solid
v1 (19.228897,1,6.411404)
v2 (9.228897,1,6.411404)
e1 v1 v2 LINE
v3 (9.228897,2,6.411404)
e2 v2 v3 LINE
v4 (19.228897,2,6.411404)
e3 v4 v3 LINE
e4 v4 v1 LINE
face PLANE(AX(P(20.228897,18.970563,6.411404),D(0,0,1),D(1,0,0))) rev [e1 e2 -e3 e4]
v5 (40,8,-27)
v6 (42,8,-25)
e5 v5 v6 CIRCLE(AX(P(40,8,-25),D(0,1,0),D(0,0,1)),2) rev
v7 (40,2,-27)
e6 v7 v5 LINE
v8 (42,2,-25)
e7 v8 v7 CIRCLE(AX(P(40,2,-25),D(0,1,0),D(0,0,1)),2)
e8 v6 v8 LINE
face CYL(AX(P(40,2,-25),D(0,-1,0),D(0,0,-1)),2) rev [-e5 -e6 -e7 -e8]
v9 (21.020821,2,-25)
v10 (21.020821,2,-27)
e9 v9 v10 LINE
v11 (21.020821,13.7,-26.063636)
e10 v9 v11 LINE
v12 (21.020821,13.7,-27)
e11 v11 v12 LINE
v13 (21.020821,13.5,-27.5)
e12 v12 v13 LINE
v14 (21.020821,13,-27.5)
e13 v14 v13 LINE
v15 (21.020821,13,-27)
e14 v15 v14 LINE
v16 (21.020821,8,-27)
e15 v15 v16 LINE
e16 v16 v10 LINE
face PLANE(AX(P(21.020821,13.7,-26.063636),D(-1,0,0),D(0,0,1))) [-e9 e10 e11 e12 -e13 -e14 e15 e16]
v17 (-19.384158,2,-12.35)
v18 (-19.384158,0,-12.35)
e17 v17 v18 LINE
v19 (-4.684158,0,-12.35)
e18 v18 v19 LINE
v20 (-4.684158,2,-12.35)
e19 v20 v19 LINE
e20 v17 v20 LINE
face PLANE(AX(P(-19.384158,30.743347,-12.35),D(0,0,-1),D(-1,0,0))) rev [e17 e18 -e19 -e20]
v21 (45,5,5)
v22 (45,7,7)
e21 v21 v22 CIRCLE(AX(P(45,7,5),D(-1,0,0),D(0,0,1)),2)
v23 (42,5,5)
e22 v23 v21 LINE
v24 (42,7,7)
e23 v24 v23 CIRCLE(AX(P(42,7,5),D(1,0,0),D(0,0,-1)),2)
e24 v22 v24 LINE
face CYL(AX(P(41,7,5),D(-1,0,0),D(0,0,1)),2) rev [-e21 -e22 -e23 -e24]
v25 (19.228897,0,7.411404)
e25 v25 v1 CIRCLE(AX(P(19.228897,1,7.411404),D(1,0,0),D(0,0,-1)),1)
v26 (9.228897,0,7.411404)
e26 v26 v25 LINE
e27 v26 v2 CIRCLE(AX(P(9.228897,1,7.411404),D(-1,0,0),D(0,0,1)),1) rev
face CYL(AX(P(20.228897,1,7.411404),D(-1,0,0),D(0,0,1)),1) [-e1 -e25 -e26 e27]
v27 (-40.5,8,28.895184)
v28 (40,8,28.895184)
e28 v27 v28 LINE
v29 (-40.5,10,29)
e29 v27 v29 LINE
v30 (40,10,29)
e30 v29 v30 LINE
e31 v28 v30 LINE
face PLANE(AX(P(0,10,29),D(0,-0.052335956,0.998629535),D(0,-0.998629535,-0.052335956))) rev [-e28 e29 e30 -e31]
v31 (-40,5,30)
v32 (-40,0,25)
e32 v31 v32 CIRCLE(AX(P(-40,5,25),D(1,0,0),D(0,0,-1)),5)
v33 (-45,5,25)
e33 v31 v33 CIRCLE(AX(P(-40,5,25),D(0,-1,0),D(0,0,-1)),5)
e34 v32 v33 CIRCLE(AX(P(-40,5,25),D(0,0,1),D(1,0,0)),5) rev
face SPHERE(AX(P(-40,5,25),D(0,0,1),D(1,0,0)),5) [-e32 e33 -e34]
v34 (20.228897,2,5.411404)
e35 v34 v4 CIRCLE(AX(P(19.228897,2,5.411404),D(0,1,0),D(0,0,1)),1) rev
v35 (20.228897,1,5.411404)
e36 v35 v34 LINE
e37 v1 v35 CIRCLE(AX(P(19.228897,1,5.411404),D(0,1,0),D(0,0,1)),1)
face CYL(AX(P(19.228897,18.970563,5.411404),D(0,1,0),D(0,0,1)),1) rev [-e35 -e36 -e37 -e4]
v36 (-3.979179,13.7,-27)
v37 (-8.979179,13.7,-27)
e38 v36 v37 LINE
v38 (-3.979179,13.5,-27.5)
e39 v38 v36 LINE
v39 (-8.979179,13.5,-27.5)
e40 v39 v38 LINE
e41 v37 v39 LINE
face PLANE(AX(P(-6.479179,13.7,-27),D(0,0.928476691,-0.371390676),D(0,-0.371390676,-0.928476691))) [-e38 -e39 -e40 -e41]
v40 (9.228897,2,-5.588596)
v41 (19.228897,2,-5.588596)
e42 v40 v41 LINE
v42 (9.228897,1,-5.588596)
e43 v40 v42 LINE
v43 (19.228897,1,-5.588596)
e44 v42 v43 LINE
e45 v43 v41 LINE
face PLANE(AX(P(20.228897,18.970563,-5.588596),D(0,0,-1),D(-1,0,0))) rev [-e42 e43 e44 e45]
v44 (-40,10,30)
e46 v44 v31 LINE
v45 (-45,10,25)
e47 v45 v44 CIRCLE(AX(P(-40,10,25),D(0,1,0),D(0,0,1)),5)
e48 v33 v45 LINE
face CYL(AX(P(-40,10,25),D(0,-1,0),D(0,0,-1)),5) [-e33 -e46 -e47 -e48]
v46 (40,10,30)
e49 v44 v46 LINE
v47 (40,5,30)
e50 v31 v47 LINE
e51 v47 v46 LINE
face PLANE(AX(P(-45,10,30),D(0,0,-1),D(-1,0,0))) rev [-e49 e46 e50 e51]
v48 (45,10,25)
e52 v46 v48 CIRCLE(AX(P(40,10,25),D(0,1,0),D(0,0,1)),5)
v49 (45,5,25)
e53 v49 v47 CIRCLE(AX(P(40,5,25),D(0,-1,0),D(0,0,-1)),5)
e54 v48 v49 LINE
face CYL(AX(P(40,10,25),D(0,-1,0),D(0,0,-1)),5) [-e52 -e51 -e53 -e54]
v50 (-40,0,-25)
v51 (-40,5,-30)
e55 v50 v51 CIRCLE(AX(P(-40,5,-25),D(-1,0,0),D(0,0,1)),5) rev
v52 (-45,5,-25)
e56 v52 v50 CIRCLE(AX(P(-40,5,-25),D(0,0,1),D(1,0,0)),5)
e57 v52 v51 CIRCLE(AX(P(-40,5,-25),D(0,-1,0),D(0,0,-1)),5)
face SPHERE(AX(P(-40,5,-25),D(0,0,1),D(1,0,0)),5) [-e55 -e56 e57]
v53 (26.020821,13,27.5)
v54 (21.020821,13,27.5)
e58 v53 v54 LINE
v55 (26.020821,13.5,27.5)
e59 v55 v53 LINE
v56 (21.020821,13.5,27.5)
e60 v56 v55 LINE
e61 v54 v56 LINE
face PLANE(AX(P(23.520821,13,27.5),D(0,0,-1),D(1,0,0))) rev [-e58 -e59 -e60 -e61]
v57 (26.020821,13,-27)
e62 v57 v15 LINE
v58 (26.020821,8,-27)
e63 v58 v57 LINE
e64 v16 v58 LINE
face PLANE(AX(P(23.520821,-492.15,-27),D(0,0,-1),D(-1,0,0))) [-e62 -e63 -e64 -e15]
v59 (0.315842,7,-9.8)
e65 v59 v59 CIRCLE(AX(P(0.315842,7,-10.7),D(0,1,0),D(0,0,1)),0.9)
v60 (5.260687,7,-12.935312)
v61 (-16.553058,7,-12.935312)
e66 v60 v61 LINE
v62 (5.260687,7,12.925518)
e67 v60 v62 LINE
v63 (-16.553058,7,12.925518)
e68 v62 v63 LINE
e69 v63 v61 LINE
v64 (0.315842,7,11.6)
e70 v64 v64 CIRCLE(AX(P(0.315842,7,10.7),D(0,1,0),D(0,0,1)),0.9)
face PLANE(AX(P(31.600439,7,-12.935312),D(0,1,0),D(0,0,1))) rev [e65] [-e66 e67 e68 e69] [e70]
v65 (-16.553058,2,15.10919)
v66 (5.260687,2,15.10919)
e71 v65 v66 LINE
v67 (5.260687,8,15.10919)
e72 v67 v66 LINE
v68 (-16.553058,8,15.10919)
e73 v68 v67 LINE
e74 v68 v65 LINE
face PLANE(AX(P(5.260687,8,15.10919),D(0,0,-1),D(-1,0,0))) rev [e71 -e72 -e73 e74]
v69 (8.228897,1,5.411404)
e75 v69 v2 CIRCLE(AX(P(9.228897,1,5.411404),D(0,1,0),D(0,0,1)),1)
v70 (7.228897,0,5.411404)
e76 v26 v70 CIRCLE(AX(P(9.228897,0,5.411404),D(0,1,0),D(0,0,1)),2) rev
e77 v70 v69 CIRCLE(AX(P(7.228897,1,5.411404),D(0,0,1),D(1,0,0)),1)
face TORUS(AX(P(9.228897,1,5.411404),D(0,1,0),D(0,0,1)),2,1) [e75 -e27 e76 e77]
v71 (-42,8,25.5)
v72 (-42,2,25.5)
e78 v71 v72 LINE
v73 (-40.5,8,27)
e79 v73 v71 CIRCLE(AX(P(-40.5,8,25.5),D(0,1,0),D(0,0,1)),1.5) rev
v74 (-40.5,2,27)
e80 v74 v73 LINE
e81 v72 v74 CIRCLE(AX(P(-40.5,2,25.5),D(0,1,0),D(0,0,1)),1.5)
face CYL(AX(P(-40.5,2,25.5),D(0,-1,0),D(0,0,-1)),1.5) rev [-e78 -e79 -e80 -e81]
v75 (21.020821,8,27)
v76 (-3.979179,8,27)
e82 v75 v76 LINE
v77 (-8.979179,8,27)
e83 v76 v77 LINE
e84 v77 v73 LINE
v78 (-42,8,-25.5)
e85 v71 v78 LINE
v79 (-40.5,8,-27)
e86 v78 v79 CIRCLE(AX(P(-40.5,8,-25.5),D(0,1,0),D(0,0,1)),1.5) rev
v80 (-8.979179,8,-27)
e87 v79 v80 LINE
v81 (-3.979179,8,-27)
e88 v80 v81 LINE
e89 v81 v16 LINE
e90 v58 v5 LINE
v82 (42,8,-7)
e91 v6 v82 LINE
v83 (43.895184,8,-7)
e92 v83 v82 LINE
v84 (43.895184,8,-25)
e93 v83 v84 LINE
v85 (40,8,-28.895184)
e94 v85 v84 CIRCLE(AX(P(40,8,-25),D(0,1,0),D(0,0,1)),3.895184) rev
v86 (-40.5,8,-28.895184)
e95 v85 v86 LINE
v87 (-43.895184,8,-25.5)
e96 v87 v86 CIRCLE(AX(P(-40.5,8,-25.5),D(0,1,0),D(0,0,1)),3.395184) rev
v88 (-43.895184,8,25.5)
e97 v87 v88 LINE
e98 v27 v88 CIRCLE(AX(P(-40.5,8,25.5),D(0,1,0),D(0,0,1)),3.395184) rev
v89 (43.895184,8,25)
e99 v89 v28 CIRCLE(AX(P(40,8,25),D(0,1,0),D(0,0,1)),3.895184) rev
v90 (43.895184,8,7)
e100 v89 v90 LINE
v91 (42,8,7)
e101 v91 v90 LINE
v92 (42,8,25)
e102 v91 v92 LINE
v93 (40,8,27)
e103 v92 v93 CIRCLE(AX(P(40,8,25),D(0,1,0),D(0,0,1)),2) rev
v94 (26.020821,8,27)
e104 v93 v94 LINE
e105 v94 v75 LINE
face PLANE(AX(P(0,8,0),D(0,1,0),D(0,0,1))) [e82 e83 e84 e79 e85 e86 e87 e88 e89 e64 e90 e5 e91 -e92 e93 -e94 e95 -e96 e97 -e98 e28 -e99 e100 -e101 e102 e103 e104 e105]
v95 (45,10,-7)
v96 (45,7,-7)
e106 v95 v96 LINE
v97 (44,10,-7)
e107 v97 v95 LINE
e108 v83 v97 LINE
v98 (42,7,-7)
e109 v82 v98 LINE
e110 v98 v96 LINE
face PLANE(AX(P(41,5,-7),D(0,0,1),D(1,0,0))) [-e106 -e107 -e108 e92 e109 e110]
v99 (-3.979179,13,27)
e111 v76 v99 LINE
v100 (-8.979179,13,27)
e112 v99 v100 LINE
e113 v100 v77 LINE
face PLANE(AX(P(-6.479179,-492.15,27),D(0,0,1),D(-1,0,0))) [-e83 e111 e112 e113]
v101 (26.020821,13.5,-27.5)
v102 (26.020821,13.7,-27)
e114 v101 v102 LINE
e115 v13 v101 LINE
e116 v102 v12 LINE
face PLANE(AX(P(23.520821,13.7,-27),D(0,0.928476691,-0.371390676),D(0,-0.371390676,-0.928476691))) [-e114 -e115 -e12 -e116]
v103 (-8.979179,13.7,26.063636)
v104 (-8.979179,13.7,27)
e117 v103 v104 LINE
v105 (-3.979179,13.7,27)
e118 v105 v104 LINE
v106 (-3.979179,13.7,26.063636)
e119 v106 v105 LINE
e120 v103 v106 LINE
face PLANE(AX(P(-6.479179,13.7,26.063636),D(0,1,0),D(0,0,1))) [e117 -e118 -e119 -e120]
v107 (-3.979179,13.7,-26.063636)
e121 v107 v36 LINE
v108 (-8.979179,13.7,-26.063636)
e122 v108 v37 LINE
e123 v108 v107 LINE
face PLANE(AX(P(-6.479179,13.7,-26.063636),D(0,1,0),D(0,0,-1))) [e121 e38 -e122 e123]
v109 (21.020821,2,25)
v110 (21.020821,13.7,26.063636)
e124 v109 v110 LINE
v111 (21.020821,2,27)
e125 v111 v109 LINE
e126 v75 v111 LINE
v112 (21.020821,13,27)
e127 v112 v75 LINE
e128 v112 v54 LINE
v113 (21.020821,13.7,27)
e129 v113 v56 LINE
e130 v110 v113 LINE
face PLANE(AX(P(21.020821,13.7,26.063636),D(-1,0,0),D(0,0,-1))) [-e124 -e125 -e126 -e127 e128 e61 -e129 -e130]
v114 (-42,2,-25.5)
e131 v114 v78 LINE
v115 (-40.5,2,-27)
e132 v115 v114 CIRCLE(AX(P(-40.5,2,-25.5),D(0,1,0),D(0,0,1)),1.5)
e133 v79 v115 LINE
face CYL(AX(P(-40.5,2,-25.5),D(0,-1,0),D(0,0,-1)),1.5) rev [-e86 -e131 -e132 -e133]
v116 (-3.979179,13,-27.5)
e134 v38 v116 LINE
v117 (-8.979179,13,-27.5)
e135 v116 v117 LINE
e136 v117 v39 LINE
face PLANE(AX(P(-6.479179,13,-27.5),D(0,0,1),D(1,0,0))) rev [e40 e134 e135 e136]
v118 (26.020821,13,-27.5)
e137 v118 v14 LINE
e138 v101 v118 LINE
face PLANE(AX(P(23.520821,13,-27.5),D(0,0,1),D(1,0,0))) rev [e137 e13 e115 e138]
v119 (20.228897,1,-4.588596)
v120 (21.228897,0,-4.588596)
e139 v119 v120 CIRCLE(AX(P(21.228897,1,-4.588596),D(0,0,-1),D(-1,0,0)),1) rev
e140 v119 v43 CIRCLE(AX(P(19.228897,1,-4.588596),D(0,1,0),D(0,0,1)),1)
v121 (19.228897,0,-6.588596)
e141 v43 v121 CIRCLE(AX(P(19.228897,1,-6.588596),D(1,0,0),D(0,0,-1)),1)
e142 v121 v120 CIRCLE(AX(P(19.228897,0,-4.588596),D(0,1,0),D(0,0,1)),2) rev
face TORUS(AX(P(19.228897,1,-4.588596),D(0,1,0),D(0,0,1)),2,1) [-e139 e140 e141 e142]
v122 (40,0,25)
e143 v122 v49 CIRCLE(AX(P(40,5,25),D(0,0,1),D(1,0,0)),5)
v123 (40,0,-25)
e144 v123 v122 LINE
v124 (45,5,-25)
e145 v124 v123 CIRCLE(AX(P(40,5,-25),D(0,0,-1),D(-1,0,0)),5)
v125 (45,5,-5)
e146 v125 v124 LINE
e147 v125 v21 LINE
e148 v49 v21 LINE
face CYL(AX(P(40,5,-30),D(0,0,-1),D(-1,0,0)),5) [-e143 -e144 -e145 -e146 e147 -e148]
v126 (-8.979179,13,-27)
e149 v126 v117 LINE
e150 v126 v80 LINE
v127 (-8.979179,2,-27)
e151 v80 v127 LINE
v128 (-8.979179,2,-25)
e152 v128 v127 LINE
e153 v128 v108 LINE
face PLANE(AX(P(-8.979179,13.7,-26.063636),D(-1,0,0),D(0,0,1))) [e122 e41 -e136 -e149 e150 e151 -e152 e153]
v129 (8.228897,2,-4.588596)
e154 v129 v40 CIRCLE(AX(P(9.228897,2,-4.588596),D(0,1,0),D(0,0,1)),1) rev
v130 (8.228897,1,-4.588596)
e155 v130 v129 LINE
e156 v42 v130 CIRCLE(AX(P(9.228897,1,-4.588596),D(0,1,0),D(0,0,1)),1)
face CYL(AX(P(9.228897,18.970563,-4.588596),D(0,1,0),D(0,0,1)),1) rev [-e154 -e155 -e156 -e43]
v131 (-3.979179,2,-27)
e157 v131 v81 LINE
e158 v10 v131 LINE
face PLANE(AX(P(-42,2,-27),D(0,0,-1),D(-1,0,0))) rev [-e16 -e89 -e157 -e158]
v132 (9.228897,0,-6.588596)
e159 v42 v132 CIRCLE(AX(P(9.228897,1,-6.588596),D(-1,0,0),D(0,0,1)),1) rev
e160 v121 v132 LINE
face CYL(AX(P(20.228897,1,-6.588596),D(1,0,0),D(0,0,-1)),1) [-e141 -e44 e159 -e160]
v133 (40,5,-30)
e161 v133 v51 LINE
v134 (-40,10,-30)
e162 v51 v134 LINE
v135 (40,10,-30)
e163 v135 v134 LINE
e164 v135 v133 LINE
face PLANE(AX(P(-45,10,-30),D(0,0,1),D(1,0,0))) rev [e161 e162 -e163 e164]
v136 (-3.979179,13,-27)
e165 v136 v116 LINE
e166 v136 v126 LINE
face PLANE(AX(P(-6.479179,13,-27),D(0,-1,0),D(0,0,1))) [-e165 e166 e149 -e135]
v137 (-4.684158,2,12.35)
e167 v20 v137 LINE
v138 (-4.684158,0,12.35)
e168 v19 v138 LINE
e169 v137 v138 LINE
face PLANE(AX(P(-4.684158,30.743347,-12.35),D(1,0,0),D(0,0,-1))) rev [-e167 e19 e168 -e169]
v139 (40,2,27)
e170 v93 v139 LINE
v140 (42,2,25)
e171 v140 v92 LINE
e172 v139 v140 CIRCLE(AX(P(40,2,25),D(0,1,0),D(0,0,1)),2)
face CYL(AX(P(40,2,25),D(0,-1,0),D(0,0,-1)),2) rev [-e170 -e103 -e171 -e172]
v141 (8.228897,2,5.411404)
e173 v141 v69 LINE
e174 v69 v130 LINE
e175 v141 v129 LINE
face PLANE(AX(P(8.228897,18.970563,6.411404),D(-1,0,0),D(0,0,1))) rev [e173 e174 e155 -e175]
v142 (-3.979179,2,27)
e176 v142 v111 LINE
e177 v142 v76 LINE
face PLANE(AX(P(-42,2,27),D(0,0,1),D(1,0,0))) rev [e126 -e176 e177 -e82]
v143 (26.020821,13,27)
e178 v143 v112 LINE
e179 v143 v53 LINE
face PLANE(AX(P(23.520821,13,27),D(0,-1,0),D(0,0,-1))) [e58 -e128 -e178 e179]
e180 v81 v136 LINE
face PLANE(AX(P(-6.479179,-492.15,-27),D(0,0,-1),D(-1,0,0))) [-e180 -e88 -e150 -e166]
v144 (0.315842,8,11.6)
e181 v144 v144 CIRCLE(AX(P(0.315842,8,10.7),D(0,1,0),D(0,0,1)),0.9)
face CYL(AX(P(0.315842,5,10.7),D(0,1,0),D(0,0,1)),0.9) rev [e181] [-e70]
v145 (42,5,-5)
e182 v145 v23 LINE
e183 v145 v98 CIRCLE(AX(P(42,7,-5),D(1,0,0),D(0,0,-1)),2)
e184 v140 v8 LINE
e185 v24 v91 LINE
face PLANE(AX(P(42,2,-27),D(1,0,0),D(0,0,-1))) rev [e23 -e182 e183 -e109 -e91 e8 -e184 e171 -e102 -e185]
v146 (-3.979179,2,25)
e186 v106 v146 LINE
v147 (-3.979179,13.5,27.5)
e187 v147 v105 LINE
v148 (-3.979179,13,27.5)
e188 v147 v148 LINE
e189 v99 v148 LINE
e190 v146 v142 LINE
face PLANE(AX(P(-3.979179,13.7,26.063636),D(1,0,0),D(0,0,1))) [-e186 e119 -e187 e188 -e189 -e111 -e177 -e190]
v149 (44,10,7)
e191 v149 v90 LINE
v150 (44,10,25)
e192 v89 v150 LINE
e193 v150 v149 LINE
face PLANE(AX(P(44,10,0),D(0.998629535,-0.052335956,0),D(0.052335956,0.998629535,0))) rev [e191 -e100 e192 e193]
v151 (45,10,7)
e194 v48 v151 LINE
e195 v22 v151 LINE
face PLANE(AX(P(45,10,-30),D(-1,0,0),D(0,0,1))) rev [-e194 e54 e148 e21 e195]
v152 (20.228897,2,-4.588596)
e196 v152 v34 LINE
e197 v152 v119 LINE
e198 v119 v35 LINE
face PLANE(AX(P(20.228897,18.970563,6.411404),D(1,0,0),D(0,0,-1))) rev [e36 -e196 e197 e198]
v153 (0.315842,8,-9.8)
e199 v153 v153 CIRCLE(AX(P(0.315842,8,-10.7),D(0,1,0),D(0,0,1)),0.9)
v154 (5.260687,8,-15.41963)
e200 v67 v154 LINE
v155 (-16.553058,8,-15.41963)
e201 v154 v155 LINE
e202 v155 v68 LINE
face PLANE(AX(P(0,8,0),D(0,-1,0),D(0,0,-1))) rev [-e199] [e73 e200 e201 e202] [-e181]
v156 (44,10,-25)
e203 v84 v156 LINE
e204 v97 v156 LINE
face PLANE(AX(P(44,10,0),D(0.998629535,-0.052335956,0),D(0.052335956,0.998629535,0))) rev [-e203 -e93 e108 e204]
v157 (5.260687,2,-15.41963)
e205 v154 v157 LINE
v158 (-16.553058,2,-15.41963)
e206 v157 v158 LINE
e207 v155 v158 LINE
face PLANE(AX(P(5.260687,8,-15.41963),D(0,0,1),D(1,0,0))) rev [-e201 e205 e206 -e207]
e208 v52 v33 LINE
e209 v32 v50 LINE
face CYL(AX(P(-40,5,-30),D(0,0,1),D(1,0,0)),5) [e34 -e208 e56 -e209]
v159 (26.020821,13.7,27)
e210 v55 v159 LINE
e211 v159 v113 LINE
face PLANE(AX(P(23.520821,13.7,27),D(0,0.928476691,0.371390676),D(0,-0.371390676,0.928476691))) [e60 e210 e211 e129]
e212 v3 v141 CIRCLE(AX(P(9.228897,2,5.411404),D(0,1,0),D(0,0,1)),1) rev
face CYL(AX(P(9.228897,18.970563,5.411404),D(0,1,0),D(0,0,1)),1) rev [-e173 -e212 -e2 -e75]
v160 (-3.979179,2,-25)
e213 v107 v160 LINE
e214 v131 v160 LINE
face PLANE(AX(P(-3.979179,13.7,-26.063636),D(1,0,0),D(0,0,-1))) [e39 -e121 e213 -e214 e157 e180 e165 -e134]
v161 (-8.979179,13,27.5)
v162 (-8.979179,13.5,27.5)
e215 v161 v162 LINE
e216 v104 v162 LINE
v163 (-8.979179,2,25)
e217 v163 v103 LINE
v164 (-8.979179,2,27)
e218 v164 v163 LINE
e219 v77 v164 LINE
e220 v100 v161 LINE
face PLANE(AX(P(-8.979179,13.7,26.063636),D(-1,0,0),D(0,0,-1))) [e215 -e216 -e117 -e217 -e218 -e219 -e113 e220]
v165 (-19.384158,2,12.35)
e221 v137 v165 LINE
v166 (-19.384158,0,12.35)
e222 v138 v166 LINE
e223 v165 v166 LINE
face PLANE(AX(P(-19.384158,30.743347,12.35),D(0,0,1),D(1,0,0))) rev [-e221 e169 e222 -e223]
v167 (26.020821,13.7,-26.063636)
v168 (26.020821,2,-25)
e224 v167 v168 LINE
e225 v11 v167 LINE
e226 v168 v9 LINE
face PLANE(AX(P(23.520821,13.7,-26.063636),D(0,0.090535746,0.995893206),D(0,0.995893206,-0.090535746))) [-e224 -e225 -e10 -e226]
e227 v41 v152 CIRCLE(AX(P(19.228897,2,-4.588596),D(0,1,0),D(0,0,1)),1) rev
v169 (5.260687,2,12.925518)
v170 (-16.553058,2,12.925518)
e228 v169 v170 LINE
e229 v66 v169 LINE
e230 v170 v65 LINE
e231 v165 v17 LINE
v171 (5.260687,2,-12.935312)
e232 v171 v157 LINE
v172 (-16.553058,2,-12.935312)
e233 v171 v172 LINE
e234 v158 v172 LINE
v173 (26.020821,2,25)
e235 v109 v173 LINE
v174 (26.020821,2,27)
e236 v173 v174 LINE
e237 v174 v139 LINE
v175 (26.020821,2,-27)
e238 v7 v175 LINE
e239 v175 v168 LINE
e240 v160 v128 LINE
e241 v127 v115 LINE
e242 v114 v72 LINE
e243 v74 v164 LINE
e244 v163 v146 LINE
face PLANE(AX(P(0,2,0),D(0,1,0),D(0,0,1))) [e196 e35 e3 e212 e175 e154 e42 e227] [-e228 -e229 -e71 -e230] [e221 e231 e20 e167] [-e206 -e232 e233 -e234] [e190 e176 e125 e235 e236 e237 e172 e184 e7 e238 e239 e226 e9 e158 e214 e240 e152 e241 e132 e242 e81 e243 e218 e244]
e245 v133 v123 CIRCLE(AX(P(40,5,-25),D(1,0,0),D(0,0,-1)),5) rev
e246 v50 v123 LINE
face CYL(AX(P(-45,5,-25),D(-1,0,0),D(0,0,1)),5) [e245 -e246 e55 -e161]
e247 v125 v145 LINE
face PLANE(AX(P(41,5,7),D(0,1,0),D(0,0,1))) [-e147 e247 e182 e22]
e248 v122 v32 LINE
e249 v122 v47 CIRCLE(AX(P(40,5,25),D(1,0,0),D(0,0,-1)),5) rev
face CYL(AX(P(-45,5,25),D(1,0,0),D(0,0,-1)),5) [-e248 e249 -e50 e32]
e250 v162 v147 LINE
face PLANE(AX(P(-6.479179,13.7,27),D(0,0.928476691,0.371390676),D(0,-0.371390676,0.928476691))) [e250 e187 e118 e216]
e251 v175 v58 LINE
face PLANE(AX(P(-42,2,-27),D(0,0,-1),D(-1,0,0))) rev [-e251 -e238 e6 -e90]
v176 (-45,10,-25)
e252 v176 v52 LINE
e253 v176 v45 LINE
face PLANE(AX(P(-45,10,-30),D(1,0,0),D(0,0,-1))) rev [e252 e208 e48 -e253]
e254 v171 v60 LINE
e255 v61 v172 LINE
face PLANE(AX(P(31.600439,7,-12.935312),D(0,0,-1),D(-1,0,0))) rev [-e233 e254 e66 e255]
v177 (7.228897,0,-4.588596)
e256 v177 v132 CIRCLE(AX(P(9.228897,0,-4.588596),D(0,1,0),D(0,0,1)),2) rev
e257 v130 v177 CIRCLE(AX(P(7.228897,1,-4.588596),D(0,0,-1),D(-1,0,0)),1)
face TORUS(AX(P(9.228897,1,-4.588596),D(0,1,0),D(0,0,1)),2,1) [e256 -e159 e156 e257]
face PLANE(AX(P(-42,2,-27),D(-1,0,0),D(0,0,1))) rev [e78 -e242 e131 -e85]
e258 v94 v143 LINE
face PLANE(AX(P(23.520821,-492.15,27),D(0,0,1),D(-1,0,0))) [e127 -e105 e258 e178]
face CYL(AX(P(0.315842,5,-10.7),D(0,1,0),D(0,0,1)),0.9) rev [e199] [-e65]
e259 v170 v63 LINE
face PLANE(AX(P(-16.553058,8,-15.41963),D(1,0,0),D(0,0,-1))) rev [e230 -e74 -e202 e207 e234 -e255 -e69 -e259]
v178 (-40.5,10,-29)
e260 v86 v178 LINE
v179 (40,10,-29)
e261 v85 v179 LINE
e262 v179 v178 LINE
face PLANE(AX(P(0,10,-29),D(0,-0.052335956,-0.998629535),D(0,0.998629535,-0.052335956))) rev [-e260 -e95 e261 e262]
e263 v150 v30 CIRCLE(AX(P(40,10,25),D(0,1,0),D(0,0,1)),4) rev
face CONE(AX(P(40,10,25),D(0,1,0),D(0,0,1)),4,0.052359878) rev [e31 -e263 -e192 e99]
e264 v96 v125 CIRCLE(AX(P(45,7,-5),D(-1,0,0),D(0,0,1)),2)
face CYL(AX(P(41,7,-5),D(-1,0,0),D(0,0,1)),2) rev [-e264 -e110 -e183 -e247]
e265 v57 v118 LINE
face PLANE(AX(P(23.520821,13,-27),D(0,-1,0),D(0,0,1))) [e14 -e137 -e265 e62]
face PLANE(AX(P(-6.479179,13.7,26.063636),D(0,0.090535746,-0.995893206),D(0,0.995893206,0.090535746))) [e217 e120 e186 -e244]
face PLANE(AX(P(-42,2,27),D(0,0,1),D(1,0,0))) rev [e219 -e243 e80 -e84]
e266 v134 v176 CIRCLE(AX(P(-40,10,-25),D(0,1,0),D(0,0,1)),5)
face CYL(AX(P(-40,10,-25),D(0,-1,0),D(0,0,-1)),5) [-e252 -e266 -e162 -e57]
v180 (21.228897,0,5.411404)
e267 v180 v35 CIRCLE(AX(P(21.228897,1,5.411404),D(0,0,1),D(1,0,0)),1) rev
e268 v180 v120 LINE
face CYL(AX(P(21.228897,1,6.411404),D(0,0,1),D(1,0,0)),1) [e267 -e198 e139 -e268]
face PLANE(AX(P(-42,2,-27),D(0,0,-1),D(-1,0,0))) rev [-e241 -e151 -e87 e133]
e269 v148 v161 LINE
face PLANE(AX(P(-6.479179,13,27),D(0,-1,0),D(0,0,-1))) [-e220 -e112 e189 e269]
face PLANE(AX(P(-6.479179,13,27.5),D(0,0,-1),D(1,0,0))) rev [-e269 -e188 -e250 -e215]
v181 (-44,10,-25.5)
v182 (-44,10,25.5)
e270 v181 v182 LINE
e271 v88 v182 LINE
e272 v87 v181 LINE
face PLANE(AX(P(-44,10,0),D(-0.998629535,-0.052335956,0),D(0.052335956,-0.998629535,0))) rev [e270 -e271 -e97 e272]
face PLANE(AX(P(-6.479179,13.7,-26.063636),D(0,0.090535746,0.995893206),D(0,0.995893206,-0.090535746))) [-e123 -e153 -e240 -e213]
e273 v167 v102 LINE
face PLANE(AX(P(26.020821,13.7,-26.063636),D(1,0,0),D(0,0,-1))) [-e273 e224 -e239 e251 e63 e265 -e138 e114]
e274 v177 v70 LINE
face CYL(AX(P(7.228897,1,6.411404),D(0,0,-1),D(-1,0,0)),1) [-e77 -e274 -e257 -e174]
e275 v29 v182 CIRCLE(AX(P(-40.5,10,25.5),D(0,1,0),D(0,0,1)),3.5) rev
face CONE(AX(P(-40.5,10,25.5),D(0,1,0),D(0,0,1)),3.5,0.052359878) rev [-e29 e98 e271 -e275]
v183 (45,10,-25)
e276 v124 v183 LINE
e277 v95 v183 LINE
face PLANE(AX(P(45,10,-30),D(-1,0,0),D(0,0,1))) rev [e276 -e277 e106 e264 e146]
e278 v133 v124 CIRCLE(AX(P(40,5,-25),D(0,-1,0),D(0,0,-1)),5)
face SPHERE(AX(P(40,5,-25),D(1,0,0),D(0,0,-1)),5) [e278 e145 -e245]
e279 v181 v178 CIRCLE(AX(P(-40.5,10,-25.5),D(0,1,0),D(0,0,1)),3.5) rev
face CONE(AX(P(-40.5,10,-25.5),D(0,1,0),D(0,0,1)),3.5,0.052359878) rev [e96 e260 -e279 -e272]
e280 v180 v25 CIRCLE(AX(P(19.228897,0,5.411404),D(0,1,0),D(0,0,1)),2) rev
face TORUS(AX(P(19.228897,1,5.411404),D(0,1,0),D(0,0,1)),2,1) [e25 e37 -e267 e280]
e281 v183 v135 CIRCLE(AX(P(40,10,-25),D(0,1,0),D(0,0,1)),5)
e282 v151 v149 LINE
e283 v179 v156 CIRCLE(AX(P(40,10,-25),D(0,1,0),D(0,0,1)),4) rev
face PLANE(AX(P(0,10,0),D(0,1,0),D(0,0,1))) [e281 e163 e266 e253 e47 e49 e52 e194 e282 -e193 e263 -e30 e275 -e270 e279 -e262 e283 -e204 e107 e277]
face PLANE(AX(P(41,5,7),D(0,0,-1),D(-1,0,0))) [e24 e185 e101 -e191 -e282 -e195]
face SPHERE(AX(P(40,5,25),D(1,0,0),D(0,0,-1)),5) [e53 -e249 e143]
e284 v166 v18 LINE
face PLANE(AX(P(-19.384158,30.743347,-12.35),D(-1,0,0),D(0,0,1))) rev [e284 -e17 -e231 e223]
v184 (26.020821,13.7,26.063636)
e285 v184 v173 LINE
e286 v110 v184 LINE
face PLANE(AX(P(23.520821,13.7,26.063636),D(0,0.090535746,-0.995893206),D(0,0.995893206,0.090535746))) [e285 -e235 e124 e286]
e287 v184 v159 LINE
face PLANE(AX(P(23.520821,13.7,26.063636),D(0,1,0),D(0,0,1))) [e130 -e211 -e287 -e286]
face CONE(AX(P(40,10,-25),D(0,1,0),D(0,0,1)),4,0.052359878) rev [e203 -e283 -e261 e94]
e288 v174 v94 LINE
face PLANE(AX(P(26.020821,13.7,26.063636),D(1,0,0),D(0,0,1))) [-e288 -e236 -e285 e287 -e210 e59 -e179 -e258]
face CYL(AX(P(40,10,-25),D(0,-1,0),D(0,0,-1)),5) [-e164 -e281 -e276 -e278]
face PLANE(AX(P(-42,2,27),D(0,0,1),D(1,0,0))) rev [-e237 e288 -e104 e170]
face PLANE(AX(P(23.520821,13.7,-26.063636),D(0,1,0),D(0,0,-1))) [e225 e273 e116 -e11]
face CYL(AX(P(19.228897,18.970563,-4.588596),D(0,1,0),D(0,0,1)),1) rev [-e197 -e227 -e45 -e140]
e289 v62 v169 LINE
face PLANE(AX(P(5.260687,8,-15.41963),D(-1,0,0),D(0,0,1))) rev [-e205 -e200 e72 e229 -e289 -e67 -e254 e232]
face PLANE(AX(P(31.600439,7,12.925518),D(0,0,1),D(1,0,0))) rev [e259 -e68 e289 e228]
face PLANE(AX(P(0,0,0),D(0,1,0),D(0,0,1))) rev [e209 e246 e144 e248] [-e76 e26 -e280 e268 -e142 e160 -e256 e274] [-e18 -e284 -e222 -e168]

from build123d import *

# Parameters (mm, degrees)
SKETCH1_W                = 90
SKETCH1_H                = 60
BOSS_EXTRUDE1_DEPTH      = 10
SKETCH2_W                = 84
SKETCH2_H                = 54
CUT_EXTRUDE1_DEPTH       = 8
FILLET1_R                = 1.5
FILLET2_R                = 2
FILLET3_R                = 5
FILLET4_R                = 5
SKETCH3_W                = 14.7
SKETCH3_H                = 24.7
CUT_EXTRUDE2_DEPTH       = 2
SKETCH4_W                = 21.81374525
SKETCH4_H                = 30.528820574
BOSS_EXTRUDE2_DEPTH      = 6
SKETCH5_W                = 25.860829819
SKETCH5_H                = 5
CUT_EXTRUDE3_DEPTH       = 21.813745251
SKETCH7_R                = 0.9
CUT_EXTRUDE5_DEPTH       = 3
SKETCH8_R                = 0.9
CUT_EXTRUDE6_DEPTH       = 3
SKETCH13_W               = 14
SKETCH13_H               = 10
CUT_EXTRUDE8_DEPTH       = 4
SKETCH14_W               = 12
SKETCH14_H               = 12
CUT_EXTRUDE9_DEPTH       = 2
FILLET8_R                = 1
LIP_GROOVE1_GROOVE_DEPTH = 2
LIP_GROOVE1_GROOVE_DRAFT = -3
FILLET9_R                = 2
SNAP_START               = -8.979179279
SNAP_HOOK9_DEPTH         = 5
LPATTERN1_COUNT          = 2
LPATTERN1_PITCH          = 30
MIRROR1_START            = -8.979179279
MIRROR1_COPY_1_DEPTH     = 5


# Read off the part's stored shape, not the designer's step: Lip&Groove1-Groove, Snap Hook9
with BuildPart() as part:
    # Sketch1 → Boss-Extrude1 (new body)
    with BuildSketch(Plane(origin=(0, 0, 0), x_dir=(1, 0, 0), z_dir=(0, 1, 0))):
        Rectangle(SKETCH1_W, SKETCH1_H)
    extrude(amount=BOSS_EXTRUDE1_DEPTH)

    # Sketch2 → Cut-Extrude1 (cut)
    with BuildSketch(Plane(origin=(0, 10, 0), x_dir=(1, 0, 0), z_dir=(0, 1, 0))):
        Rectangle(SKETCH2_W, SKETCH2_H)
    extrude(amount=-CUT_EXTRUDE1_DEPTH, mode=Mode.SUBTRACT)

    # Fillet1
    fillet1_edges = [part.edges().sort_by_distance(p)[0] for p in [
        (-42, 6, 27),
        (-42, 6, -27),
    ]]
    fillet(fillet1_edges, radius=FILLET1_R)

    # Fillet2
    fillet2_edges = [part.edges().sort_by_distance(p)[0] for p in [
        (42, 6, -27),
        (42, 6, 27),
    ]]
    fillet(fillet2_edges, radius=FILLET2_R)

    # Fillet3
    fillet3_edges = [part.edges().sort_by_distance(p)[0] for p in [
        (0, 0, 30),
        (-45, 0, 0),
        (0, 0, -30),
        (45, 0, 0),
        (45, 5, 30),
        (45, 5, -30),
    ]]
    fillet(fillet3_edges, radius=FILLET3_R)

    # Fillet4
    # the kernel refuses this fillet: 5 mm, written as the material it takes off along each edge
    with BuildSketch(Plane(origin=(-40, 5, -25), x_dir=(-1, 0, 0), z_dir=(0, 0, -1))) as fillet4_piece_1_section:
        Polygon((0, 0), (FILLET4_R, 0), (FILLET4_R, -FILLET4_R), (0, -FILLET4_R), align=None)
    fillet4_piece_1 = extrude(amount=FILLET4_R, mode=Mode.PRIVATE)
    fillet4_piece_1 = fillet4_piece_1 - Plane(origin=(-40, 5, -25), x_dir=(0.7071067811865475, 0.7071067811865475, 0), z_dir=(0, 0, -1)) * Sphere(FILLET4_R, mode=Mode.PRIVATE)
    add(fillet4_piece_1, mode=Mode.SUBTRACT)
    with BuildSketch(Plane(origin=(-40, 5, 25), x_dir=(0, 0, 1), z_dir=(-1, 0, 0))) as fillet4_piece_2_section:
        Polygon((0, 0), (FILLET4_R, 0), (FILLET4_R, -FILLET4_R), (0, -FILLET4_R), align=None)
    fillet4_piece_2 = extrude(amount=FILLET4_R, mode=Mode.PRIVATE)
    fillet4_piece_2 = fillet4_piece_2 - Plane(origin=(-40, 5, 25), x_dir=(0, 0.7071067811865475, -0.7071067811865475), z_dir=(-1, 0, 0)) * Sphere(FILLET4_R, mode=Mode.PRIVATE)
    add(fillet4_piece_2, mode=Mode.SUBTRACT)
    with BuildSketch(Plane(origin=(-45, 5, 30), x_dir=(0, 0, -1), z_dir=(0, 1, 0)), Plane(origin=(-45, 5, -30), x_dir=(1, 0, 0), z_dir=(0, 1, 0))) as fillet4_piece_3:
        with BuildLine():
            CenterArc((FILLET4_R, -FILLET4_R), FILLET4_R, 90, 90)
            Line((0, -FILLET4_R), (0, 0))
            Line((0, 0), (FILLET4_R, 0))
        make_face()
    extrude(amount=17.5, mode=Mode.SUBTRACT)

    # Sketch3 → Cut-Extrude2 (cut)
    with BuildSketch(Plane.XZ):
        with Locations((-12.034158324, 0)):
            Rectangle(SKETCH3_W, SKETCH3_H)
    extrude(amount=-CUT_EXTRUDE2_DEPTH, mode=Mode.SUBTRACT)

    # Sketch4 → Boss-Extrude2 (add)
    with BuildSketch(Plane(origin=(0, 2, 0), x_dir=(1, 0, 0), z_dir=(0, 1, 0))):
        with Locations((-5.646185712, 0.155219816)):
            Rectangle(SKETCH4_W, SKETCH4_H)
    extrude(amount=BOSS_EXTRUDE2_DEPTH)

    # Sketch5 → Cut-Extrude3 (cut)
    with BuildSketch(Plane.ZY.offset(16.553058337)):
        with Locations((-0.004897078, 4.5)):
            Rectangle(SKETCH5_W, SKETCH5_H)
    extrude(amount=-CUT_EXTRUDE3_DEPTH, mode=Mode.SUBTRACT)

    # Sketch7 → Cut-Extrude5 (cut)
    with BuildSketch(Plane(origin=(0, 8, 0), x_dir=(1, 0, 0), z_dir=(0, 1, 0))):
        with Locations(Location((0.315841676, -10.7, 0), (0, 0, 270))):
            Circle(SKETCH7_R)
    extrude(amount=-CUT_EXTRUDE5_DEPTH, mode=Mode.SUBTRACT)

    # Sketch8 → Cut-Extrude6 (cut)
    with BuildSketch(Plane(origin=(0, 8, 0), x_dir=(1, 0, 0), z_dir=(0, 1, 0))):
        with Locations(Location((0.315841676, 10.7, 0), (0, 0, 270))):
            Circle(SKETCH8_R)
    extrude(amount=-CUT_EXTRUDE6_DEPTH, mode=Mode.SUBTRACT)

    # Sketch13 → Cut-Extrude8 (cut)
    with BuildSketch(Plane.ZY.offset(-45)):
        with Locations((0, 10)):
            Rectangle(SKETCH13_W, SKETCH13_H)
    extrude(amount=CUT_EXTRUDE8_DEPTH, mode=Mode.SUBTRACT)

    # Sketch14 → Cut-Extrude9 (cut)
    with BuildSketch(Plane.XZ):
        with Locations((14.228896708, 0.411404455)):
            Rectangle(SKETCH14_W, SKETCH14_H)
    extrude(amount=-CUT_EXTRUDE9_DEPTH, mode=Mode.SUBTRACT)

    # Fillet8
    fillet8_edges = [part.edges().sort_by_distance(p)[0] for p in [
        (8.228896708, 0, 0.411404455),
        (14.228896708, 0, -5.588595545),
        (20.228896708, 0, 0.411404455),
        (14.228896708, 0, 6.411404455),
        (20.228896708, 1, -5.588595545),
        (20.228896708, 1, 6.411404455),
        (8.228896708, 1, 6.411404455),
        (8.228896708, 1, -5.588595545),
    ]]
    fillet(fillet8_edges, radius=FILLET8_R)


with BuildPart() as lip_groove1_groove_tool:
    # Lip&Groove1-Groove outline → Lip&Groove1-Groove (with draft: the straight prism first)
    with BuildSketch(Plane(origin=(0, 8, 0), x_dir=(1, 0, 0), z_dir=(0, 1, 0))):
        with BuildLine():
            Line((43.895184441, 7), (43.895184441, 25))
            ThreePointArc((43.895184441, 25), (42.754311333, 27.754311333), (40, 28.895184441))
            Line((40, 28.895184441), (-40.5, 28.895184441))
            ThreePointArc((-40.5, 28.895184441), (-42.900757942, 27.900757942), (-43.895184441, 25.5))
            Line((-43.895184441, 25.5), (-43.895184441, -25.5))
            ThreePointArc((-43.895184441, -25.5), (-42.900757942, -27.900757942), (-40.5, -28.895184441))
            Line((-40.5, -28.895184441), (40, -28.895184441))
            ThreePointArc((40, -28.895184441), (42.754311333, -27.754311333), (43.895184441, -25))
            Line((43.895184441, -25), (43.895184441, -7))
            Line((43.895184441, -7), (42, -7))
            Line((42, -7), (42, -25))
            ThreePointArc((42, -25), (41.414213562, -26.414213562), (40, -27))
            Line((40, -27), (-40.5, -27))
            ThreePointArc((-40.5, -27), (-41.560660172, -26.560660172), (-42, -25.5))
            Line((-42, -25.5), (-42, 25.5))
            ThreePointArc((-42, 25.5), (-41.560660172, 26.560660172), (-40.5, 27))
            Line((-40.5, 27), (40, 27))
            ThreePointArc((40, 27), (41.414213562, 26.414213562), (42, 25))
            Line((42, 25), (42, 7))
            Line((42, 7), (43.895184441, 7))
        make_face()
    extrude(amount=LIP_GROOVE1_GROOVE_DEPTH)
    # Lip&Groove1-Groove: the draft: its side faces are tilted about the plane it starts from
    lip_groove1_groove_sides = [lip_groove1_groove_tool.faces().sort_by_distance(p)[0] for p in [
        (43.895184441, 9, -16),
        (42.754311333, 9, -27.754311333),
        (-0.25, 9, -28.895184441),
        (-42.900757942, 9, -27.900757942),
        (-43.895184441, 9, 0),
        (-42.900757942, 9, 27.900757942),
        (-0.25, 9, 28.895184441),
        (42.754311333, 9, 27.754311333),
        (43.895184441, 9, 16),
        (42.94759222, 9, 7),
        (42, 9, 16),
        (41.414213562, 9, 26.414213562),
        (-0.25, 9, 27),
        (-41.560660172, 9, 26.560660172),
        (-42, 9, 0),
        (-41.560660172, 9, -26.560660172),
        (-0.25, 9, -27),
        (41.414213562, 9, -26.414213562),
        (42, 9, -16),
        (42.94759222, 9, -7),
    ]]
    draft(lip_groove1_groove_sides, Plane(origin=(0, 8, 0), x_dir=(1, 0, 0), z_dir=(0, 1, 0)), LIP_GROOVE1_GROOVE_DRAFT)


with BuildPart() as part_1:
    add(part.part)

    # Lip&Groove1-Groove: cut by lip_groove1_groove_tool
    add(lip_groove1_groove_tool.part, mode=Mode.SUBTRACT)

    # Fillet9
    fillet9_edges = [part_1.edges().sort_by_distance(p)[0] for p in [
        (43.5, 5, -7),
        (43.5, 5, 7),
    ]]
    fillet(fillet9_edges, radius=FILLET9_R)

    # Snap Hook9 outline → Snap Hook9 (add)
    with BuildSketch(Plane.YZ.offset(SNAP_START)):
        Polygon((13, 27.5), (13, 27), (2, 27), (2, 25), (13.7, 26.063636364), (13.7, 27), (13.5, 27.5), align=None)
    snap_hook9 = extrude(amount=SNAP_HOOK9_DEPTH)

    # LPattern1: Snap Hook9 ×2
    with Locations(*[(i * LPATTERN1_PITCH, 0, 0) for i in range(1, LPATTERN1_COUNT)]):
        add(snap_hook9)

    # Mirror1: Snap Hook9 across plane
    add(snap_hook9.mirror(Plane.XY))

    # Mirror1 copy 1 sketch → Mirror1 copy 1 (add)
    with BuildSketch(Plane.YZ.offset(30).offset(MIRROR1_START)):
        Polygon((13, -27.5), (13, -27), (2, -27), (2, -25), (13.7, -26.063636364), (13.7, -27), (13.5, -27.5), align=None)
    extrude(amount=MIRROR1_COPY_1_DEPTH)


solid = part_1.part
